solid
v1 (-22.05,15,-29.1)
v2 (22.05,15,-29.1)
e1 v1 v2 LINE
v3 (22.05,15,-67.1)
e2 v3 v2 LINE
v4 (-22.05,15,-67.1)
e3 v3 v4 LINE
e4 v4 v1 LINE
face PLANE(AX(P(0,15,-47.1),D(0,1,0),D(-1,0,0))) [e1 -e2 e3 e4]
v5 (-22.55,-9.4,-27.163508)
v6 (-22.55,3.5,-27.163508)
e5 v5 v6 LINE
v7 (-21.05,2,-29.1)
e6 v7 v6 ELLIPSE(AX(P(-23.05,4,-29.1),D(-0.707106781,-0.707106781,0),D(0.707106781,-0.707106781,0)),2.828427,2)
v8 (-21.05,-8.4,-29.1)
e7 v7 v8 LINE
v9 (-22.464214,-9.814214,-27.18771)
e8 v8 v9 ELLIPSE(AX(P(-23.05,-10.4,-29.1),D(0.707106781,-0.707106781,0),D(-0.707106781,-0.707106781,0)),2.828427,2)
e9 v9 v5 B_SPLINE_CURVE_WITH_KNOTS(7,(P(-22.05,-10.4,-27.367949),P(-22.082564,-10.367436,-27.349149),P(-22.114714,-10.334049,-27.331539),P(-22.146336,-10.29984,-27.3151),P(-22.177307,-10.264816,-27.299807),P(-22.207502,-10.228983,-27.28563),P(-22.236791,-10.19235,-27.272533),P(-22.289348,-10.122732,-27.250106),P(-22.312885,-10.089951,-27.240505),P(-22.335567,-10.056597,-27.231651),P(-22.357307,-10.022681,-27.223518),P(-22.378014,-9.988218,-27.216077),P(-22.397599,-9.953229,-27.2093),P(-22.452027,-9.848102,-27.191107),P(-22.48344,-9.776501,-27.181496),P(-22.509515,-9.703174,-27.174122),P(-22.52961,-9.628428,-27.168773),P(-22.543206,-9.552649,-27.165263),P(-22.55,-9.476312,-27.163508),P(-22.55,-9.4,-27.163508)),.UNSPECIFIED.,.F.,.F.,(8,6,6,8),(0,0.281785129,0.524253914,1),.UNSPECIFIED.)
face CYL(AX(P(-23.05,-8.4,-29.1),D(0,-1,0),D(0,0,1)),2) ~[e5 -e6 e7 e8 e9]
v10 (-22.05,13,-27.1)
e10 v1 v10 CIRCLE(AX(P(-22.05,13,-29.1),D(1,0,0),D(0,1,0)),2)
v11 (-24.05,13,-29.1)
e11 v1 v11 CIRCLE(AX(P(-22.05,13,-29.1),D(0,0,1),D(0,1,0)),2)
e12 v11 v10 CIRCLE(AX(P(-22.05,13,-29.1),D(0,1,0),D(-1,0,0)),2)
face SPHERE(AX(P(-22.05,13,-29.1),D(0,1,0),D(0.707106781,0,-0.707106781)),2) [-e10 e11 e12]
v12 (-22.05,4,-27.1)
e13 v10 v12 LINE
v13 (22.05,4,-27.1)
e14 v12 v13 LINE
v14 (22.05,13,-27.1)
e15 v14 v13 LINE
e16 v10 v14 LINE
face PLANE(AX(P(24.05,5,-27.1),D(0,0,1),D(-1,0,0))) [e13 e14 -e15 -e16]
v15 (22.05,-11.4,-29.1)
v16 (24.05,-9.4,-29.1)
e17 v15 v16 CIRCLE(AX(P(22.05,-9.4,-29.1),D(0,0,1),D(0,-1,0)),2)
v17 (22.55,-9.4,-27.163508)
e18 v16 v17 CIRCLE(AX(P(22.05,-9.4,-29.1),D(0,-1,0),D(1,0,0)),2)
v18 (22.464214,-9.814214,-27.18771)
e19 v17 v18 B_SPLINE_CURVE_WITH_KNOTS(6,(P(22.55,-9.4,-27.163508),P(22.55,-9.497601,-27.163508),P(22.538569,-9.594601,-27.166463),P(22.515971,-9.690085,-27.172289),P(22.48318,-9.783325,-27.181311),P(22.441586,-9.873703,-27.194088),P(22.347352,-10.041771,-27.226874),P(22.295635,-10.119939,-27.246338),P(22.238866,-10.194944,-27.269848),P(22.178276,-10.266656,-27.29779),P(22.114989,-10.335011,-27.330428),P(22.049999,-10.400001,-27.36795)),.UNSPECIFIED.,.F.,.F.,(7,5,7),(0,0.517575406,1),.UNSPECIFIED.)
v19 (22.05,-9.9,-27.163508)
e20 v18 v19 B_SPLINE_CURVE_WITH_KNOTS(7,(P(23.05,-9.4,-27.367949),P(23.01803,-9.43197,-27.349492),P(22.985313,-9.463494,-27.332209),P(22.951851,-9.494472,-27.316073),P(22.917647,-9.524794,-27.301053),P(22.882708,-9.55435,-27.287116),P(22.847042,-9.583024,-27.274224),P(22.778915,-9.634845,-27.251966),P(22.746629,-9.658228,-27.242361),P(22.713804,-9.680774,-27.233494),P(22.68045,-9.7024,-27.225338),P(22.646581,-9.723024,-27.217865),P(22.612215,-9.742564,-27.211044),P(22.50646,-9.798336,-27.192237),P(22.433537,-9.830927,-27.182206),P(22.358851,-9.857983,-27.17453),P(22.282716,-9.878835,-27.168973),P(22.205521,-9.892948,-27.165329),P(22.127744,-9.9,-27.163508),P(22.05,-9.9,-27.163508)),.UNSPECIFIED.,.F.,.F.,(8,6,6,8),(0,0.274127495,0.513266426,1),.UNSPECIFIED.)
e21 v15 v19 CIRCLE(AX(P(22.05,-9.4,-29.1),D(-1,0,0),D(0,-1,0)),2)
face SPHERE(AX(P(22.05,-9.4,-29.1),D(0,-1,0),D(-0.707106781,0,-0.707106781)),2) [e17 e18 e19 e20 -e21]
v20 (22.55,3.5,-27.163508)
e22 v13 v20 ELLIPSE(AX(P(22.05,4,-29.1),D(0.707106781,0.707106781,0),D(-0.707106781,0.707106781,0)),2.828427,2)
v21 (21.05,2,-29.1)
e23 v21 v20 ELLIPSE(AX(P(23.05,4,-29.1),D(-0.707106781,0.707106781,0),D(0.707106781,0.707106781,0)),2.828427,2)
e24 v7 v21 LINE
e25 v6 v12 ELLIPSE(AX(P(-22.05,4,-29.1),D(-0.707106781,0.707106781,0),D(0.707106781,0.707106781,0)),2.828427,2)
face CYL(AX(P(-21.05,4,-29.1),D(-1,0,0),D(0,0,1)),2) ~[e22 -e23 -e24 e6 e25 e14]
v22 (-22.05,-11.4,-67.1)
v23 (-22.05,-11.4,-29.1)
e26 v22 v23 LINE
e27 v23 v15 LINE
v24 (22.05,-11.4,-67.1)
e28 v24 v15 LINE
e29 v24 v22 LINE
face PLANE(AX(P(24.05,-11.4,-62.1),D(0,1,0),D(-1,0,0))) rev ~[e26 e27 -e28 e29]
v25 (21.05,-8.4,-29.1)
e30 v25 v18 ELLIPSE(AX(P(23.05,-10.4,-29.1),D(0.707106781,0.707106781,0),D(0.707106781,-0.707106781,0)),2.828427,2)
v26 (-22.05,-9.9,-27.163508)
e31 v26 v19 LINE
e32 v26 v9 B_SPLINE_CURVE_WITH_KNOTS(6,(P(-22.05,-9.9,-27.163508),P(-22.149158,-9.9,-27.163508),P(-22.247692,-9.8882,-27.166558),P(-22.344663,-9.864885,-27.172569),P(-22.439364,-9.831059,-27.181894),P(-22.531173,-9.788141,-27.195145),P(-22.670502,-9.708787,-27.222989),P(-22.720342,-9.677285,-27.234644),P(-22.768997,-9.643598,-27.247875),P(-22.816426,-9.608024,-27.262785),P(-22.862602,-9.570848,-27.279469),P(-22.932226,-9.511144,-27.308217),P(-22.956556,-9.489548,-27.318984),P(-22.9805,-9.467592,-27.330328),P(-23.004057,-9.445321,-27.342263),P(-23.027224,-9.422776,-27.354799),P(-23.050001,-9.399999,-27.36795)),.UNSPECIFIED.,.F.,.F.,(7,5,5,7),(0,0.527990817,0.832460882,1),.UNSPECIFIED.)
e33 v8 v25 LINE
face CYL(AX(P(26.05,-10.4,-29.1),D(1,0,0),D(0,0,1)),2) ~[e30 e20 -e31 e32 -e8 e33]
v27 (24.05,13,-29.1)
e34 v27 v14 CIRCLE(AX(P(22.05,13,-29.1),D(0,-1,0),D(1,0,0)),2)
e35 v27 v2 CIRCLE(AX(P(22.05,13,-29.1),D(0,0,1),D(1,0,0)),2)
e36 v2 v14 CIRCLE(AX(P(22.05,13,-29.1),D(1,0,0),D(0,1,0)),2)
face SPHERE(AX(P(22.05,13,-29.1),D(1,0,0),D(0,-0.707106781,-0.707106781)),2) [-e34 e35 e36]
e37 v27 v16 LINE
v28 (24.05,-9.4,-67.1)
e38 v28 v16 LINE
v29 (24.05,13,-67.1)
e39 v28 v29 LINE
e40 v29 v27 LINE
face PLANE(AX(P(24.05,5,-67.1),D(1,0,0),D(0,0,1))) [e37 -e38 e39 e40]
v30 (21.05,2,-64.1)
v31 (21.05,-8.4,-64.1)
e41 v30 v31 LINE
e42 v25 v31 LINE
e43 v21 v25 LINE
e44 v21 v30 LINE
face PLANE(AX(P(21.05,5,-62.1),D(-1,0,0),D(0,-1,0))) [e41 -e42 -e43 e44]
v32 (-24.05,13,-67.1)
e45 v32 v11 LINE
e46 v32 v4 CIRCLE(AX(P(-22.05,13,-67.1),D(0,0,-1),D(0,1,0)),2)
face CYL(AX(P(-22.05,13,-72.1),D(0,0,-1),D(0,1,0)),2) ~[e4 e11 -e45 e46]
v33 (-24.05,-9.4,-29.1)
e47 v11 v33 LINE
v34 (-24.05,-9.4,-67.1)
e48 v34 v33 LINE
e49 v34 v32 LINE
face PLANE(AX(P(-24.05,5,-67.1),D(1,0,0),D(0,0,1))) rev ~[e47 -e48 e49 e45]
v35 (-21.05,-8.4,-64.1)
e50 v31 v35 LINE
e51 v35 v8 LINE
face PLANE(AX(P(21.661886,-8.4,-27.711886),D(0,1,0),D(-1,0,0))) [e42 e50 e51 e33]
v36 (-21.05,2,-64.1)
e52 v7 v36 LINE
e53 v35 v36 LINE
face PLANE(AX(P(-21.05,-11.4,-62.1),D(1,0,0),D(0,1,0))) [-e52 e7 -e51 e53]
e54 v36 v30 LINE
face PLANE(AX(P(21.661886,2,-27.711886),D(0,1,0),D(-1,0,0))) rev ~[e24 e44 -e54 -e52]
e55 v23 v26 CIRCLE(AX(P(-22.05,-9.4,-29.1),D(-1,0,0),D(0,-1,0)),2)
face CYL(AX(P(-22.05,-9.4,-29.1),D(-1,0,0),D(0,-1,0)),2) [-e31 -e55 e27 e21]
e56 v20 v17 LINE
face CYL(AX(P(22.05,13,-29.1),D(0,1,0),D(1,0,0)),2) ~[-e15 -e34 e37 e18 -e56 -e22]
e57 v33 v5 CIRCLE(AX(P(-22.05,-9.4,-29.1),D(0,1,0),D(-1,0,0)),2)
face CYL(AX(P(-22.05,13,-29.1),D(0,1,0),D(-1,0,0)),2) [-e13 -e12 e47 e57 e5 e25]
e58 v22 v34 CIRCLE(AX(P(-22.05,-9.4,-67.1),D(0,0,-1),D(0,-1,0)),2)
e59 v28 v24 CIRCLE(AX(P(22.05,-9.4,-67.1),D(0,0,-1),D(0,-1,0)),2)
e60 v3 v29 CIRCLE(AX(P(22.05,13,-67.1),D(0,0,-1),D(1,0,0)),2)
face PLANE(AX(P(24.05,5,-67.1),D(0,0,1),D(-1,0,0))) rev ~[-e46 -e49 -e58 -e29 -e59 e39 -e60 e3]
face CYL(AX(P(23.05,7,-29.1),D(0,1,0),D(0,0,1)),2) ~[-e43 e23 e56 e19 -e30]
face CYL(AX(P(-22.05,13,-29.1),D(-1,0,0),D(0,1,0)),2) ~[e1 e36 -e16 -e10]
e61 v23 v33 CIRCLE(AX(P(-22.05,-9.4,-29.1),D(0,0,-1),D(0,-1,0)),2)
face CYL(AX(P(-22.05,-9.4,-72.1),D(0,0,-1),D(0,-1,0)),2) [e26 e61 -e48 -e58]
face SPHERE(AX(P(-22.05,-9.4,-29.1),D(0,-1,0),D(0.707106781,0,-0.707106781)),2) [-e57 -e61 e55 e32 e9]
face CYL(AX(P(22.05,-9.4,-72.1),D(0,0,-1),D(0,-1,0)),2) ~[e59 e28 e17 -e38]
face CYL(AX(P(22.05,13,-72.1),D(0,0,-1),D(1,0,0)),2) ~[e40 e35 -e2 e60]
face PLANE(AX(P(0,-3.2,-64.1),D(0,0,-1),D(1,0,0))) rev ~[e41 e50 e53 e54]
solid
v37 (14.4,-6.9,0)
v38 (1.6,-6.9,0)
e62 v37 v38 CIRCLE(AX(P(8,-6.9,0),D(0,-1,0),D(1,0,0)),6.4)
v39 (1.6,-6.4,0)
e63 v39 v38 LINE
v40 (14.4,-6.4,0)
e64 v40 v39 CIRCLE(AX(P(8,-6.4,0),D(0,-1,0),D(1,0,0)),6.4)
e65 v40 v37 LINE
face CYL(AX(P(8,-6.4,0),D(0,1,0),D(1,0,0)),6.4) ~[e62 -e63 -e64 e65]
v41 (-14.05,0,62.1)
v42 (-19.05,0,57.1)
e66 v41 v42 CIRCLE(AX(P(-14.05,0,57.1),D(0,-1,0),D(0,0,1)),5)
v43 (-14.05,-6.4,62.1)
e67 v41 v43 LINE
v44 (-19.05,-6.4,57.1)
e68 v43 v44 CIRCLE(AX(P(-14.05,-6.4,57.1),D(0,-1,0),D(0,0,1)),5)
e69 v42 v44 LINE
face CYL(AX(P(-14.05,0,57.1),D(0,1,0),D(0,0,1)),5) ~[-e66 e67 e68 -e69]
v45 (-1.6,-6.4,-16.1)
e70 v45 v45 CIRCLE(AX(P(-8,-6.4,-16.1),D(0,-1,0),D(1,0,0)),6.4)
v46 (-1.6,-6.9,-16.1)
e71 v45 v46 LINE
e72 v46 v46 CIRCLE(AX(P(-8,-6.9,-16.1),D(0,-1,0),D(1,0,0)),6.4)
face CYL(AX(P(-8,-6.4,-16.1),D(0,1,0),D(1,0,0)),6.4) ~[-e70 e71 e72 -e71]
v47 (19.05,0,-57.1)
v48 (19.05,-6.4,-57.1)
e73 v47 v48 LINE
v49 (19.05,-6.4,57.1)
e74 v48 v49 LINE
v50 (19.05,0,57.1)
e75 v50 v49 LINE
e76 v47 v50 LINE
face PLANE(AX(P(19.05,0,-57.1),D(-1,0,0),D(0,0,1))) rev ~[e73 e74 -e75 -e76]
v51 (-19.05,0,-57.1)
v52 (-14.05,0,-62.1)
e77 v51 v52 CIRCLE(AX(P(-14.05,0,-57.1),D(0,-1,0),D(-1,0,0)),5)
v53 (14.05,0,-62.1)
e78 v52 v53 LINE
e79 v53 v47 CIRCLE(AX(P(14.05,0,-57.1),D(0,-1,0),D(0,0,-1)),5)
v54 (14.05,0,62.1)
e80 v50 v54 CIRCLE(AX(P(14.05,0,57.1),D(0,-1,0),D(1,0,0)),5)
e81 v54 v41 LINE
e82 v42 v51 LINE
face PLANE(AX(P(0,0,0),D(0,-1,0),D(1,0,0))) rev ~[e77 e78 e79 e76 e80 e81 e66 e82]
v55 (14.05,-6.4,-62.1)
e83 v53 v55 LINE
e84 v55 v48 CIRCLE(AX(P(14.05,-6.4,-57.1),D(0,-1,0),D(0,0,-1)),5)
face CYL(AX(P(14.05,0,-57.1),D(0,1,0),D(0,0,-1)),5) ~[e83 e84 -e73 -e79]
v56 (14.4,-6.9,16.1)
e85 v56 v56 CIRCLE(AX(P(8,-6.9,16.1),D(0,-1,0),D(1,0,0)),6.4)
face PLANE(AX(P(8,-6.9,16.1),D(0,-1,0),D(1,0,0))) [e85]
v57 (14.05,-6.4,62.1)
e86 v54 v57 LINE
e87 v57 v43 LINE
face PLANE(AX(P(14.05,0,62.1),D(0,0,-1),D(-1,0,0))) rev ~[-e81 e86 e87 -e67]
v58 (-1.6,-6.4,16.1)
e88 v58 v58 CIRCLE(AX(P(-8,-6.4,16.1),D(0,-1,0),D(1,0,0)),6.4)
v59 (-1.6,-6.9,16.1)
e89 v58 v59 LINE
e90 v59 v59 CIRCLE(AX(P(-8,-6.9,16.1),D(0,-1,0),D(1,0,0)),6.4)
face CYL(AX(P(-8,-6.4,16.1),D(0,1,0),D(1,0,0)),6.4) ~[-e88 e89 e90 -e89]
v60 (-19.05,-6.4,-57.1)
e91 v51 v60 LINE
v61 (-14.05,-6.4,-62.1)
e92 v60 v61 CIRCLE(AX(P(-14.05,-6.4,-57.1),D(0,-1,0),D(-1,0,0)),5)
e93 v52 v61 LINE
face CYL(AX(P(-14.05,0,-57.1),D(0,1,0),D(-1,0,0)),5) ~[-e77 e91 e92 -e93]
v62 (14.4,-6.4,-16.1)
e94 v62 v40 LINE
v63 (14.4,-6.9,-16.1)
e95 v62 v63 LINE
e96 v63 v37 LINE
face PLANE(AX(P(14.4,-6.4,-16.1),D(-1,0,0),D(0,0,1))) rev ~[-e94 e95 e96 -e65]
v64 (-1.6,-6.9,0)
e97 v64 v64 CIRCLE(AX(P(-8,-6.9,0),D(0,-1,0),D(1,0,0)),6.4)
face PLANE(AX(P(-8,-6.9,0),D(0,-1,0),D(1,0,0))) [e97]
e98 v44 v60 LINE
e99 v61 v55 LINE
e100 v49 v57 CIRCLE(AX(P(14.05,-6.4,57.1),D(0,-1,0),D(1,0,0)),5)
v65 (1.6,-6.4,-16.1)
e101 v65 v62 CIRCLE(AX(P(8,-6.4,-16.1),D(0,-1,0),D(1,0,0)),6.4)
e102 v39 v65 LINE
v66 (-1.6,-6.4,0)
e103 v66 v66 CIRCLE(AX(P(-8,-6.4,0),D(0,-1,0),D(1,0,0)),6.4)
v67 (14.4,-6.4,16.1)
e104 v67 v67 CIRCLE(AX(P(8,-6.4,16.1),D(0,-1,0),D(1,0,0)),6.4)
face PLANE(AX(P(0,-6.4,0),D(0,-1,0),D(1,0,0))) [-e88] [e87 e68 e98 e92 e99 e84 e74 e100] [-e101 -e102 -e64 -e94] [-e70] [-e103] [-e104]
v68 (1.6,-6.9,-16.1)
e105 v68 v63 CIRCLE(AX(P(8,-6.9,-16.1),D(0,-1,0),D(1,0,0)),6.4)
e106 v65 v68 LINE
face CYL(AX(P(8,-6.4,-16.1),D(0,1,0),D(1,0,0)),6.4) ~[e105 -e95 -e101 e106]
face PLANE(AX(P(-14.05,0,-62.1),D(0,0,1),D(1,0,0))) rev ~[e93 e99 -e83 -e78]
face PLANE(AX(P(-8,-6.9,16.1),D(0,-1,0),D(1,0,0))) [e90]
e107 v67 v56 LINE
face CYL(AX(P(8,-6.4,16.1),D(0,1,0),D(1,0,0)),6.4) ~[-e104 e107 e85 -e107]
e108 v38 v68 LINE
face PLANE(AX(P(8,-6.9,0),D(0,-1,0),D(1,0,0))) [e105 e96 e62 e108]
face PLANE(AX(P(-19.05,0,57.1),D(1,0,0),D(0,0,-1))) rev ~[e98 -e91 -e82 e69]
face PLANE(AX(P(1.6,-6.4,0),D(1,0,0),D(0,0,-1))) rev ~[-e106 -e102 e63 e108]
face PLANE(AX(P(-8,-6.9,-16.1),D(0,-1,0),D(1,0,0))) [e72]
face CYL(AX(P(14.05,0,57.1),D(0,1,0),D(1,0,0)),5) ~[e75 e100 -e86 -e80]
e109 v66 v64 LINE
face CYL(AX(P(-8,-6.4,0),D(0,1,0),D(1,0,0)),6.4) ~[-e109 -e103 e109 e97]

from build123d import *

# Parameters (mm, degrees)
F1_DEPTH      = 6.4
F2_R          = 6.4
F3_DEPTH      = 0.5
F5_DEPTH      = 35
F5_DEPTH_BACK = 5
F6_T          = -3
F7_W          = 48.1
F7_H          = 40
F8_DEPTH      = 10
F9_T1_DEPTH   = 22.4
F9_T3_DEPTH   = 44.1
F9_T5_DEPTH   = 10.4
F9_T7_DEPTH   = 42.1
F9_T9_DEPTH   = 43
F9_S13_W      = 2
F9_S13_H      = 2
F9_T14_DEPTH  = 2
F9_S19_W      = 2
F9_S19_H      = 2
F9_T20_DEPTH  = 2
F9_S25_W      = 2
F9_S25_H      = 2
F9_T26_DEPTH  = 2
F9_S31_W      = 2
F9_S31_H      = 2
F9_T32_DEPTH  = 2
F9_T39_DEPTH  = 15.4
F9_T43_DEPTH  = 47.1
F9_T50_DEPTH  = 15.4
F9_T54_DEPTH  = 47.1
F9_T61_DEPTH  = 47.1
F9_T65_DEPTH  = 15.4
F9_T72_DEPTH  = 15.4
F9_T76_DEPTH  = 47.1


# Not quite as in the source:
# - a fillet or chamfer that OpenCascade refuses, or shapes differently, is made with other operations: its cross-section is extruded or revolved along the edge and cut away or added


with BuildPart() as f1:
    # F0 (on Front) → F1 (new body)
    with BuildSketch(Plane.XZ):
        with BuildLine():
            ThreePointArc((19.05, 57.1), (17.5855339059, 60.6355339059), (14.05, 62.1))
            Line((14.05, 62.1), (-14.05, 62.1))
            ThreePointArc((-14.05, 62.1), (-17.5855339059, 60.6355339059), (-19.05, 57.1))
            Line((-19.05, 57.1), (-19.05, -57.1))
            ThreePointArc((-19.05, -57.1), (-17.5855339059, -60.6355339059), (-14.05, -62.1))
            Line((-14.05, -62.1), (14.05, -62.1))
            ThreePointArc((14.05, -62.1), (17.5855339059, -60.6355339059), (19.05, -57.1))
            Line((19.05, -57.1), (19.05, 57.1))
        make_face()
    extrude(amount=F1_DEPTH)

    # F2 (on face) → F3 (join)
    with BuildSketch(Plane.XZ.offset(6.4)):
        with BuildLine():
            ThreePointArc((1.6, 0), (8, -6.4), (14.4, 0))
            ThreePointArc((14.4, 0), (8, 6.4), (1.6, 0))
        make_face()
        with BuildLine():
            Line((14.4, -16.1), (14.4, 0))
            ThreePointArc((14.4, 0), (8, -6.4), (1.6, 0))
            Line((1.6, 0), (1.6, -16.1))
            ThreePointArc((1.6, -16.1), (8, -9.7), (14.4, -16.1))
        make_face()
        with BuildLine():
            ThreePointArc((1.6, -16.1), (8, -22.5), (14.4, -16.1))
            ThreePointArc((14.4, -16.1), (8, -9.7), (1.6, -16.1))
        make_face()
        with Locations((8, 16.1)):
            Circle(F2_R)
        with Locations((-8, 16.1)):
            Circle(F2_R)
        with Locations((-8, 0)):
            Circle(F2_R)
        with Locations((-8, -16.1)):
            Circle(F2_R)
    extrude(amount=F3_DEPTH)


with BuildPart() as f5:
    # F4 (on face) → F5 (new body, two sides)
    with BuildSketch(Plane(origin=(0, 0, -62.1), x_dir=(1, 0, 0), z_dir=(0, 0, -1))) as f5_sk:
        Polygon((-14.05, 11.4), (-24.05, 11.4), (-24.05, -5), (-14.05, -5), (14.05, -5), (24.05, -5), (24.05, 11.4), (14.05, 11.4), align=None)
    extrude(amount=-F5_DEPTH)
    extrude(f5_sk.sketch, amount=F5_DEPTH_BACK)

    # F6
    f6_openings = [f5.faces().sort_by_distance(p)[0] for p in [
        (0, -3.2, -27.1),
    ]]
    offset(amount=F6_T, openings=f6_openings)

    # F7 (on face) → F8 (join)
    with BuildSketch(Plane(origin=(0, 5, 0), x_dir=(-1, 0, 0), z_dir=(0, 1, 0))):
        with Locations((0, -47.1)):
            Rectangle(F7_W, F7_H)
    extrude(amount=F8_DEPTH)

    # F9: fillet of radius 2 on 12 edges, made by hand

    # F9_s2 → F9_t1 (cut)
    with BuildSketch(Plane.XZ.offset(-13)):
        with BuildLine():
            ThreePointArc((-24.05, -29.1), (-23.4642135624, -27.6857864376), (-22.05, -27.1))
            Line((-22.05, -27.1), (-24.05, -27.1))
            Line((-24.05, -27.1), (-24.05, -29.1))
        make_face()
        with BuildLine():
            ThreePointArc((24.05, -29.1), (23.4642135624, -27.6857864376), (22.05, -27.1))
            Line((22.05, -27.1), (24.05, -27.1))
            Line((24.05, -27.1), (24.05, -29.1))
        make_face()
    extrude(amount=F9_T1_DEPTH, mode=Mode.SUBTRACT)

    # F9_s4 → F9_t3 (cut)
    with BuildSketch(Plane.YZ.offset(-22.05)):
        with BuildLine():
            ThreePointArc((15, -29.1), (14.4142135624, -27.6857864376), (13, -27.1))
            Line((13, -27.1), (15, -27.1))
            Line((15, -27.1), (15, -29.1))
        make_face()
        with BuildLine():
            ThreePointArc((-11.4, -29.1), (-10.8142135624, -27.6857864376), (-9.4, -27.1))
            Line((-9.4, -27.1), (-11.4, -27.1))
            Line((-11.4, -27.1), (-11.4, -29.1))
        make_face()
    extrude(amount=F9_T3_DEPTH, mode=Mode.SUBTRACT)

    # F9_s6 → F9_t5 (cut)
    with BuildSketch(Plane.XZ.offset(-2)):
        with BuildLine():
            ThreePointArc((-23.05, -27.1), (-21.6357864376, -27.6857864376), (-21.05, -29.1))
            Line((-21.05, -29.1), (-21.05, -27.1))
            Line((-21.05, -27.1), (-23.05, -27.1))
        make_face()
        with BuildLine():
            ThreePointArc((23.05, -27.1), (21.6357864376, -27.6857864376), (21.05, -29.1))
            Line((21.05, -29.1), (21.05, -27.1))
            Line((21.05, -27.1), (23.05, -27.1))
        make_face()
    extrude(amount=F9_T5_DEPTH, mode=Mode.SUBTRACT)

    # F9_s8 → F9_t7 (cut)
    with BuildSketch(Plane.YZ.offset(-21.05)):
        with BuildLine():
            ThreePointArc((-10.4, -27.1), (-8.9857864376, -27.6857864376), (-8.4, -29.1))
            Line((-8.4, -29.1), (-8.4, -27.1))
            Line((-8.4, -27.1), (-10.4, -27.1))
        make_face()
        with BuildLine():
            ThreePointArc((4, -27.1), (2.5857864376, -27.6857864376), (2, -29.1))
            Line((2, -29.1), (2, -27.1))
            Line((2, -27.1), (4, -27.1))
        make_face()
    extrude(amount=F9_T7_DEPTH, mode=Mode.SUBTRACT)

    # F9_s10 → F9_t9 (cut)
    with BuildSketch(Plane.XY.offset(-72.1)):
        with BuildLine():
            ThreePointArc((22.05, -11.4), (23.4642135624, -10.8142135624), (24.05, -9.4))
            Line((24.05, -9.4), (24.05, -11.4))
            Line((24.05, -11.4), (22.05, -11.4))
        make_face()
        with BuildLine():
            ThreePointArc((24.05, 13), (23.4642135624, 14.4142135624), (22.05, 15))
            Line((22.05, 15), (24.05, 15))
            Line((24.05, 15), (24.05, 13))
        make_face()
        with BuildLine():
            ThreePointArc((-22.05, 15), (-23.4642135624, 14.4142135624), (-24.05, 13))
            Line((-24.05, 13), (-24.05, 15))
            Line((-24.05, 15), (-22.05, 15))
        make_face()
        with BuildLine():
            ThreePointArc((-22.05, -11.4), (-23.4642135624, -10.8142135624), (-24.05, -9.4))
            Line((-24.05, -9.4), (-24.05, -11.4))
            Line((-24.05, -11.4), (-22.05, -11.4))
        make_face()
    extrude(amount=F9_T9_DEPTH, mode=Mode.SUBTRACT)


with BuildPart() as f9_tool12:
    # F9_s13 → F9_t14 (new body)
    with BuildSketch(Plane.XZ.offset(-13)):
        with Locations((-23.05, -28.1)):
            Rectangle(F9_S13_W, F9_S13_H)
    extrude(amount=-F9_T14_DEPTH)

    # F9_s15 → F9_t16 (revolve, cut)
    with BuildSketch(Plane(origin=(-22.05, 13, -29.1), x_dir=(0.7071067812, 0, -0.7071067812), z_dir=(0.7071067812, 0, 0.7071067812))):
        with BuildLine():
            ThreePointArc((0, -2), (2, 0), (0, 2))
            Line((0, 2), (0, -2))
        make_face()
    revolve(axis=Axis((-22.05, 13, -29.1), (0, 1, 0)), mode=Mode.SUBTRACT)


with BuildPart() as f5_1:
    add(f5.part)

    # F9_t11: cut F9_tool12
    add(f9_tool12.part, mode=Mode.SUBTRACT)


with BuildPart() as f9_tool18:
    # F9_s19 → F9_t20 (new body)
    with BuildSketch(Plane.XZ.offset(9.4)):
        with Locations((-23.05, -28.1)):
            Rectangle(F9_S19_W, F9_S19_H)
    extrude(amount=F9_T20_DEPTH)

    # F9_s21 → F9_t22 (revolve, cut)
    with BuildSketch(Plane(origin=(-22.05, -9.4, -29.1), x_dir=(0.7071067812, 0, -0.7071067812), z_dir=(-0.7071067812, 0, -0.7071067812))):
        with BuildLine():
            ThreePointArc((0, -2), (2, 0), (0, 2))
            Line((0, 2), (0, -2))
        make_face()
    revolve(axis=Axis((-22.05, -9.4, -29.1), (0, -1, 0)), mode=Mode.SUBTRACT)


with BuildPart() as f5_2:
    add(f5_1.part)

    # F9_t17: cut F9_tool18
    add(f9_tool18.part, mode=Mode.SUBTRACT)


with BuildPart() as f9_tool24:
    # F9_s25 → F9_t26 (new body)
    with BuildSketch(Plane.YZ.offset(22.05)):
        with Locations((14, -28.1)):
            Rectangle(F9_S25_W, F9_S25_H)
    extrude(amount=F9_T26_DEPTH)

    # F9_s27 → F9_t28 (revolve, cut)
    with BuildSketch(Plane(origin=(22.05, 13, -29.1), x_dir=(0, -0.7071067812, -0.7071067812), z_dir=(0, -0.7071067812, 0.7071067812))):
        with BuildLine():
            ThreePointArc((0, -2), (2, 0), (0, 2))
            Line((0, 2), (0, -2))
        make_face()
    revolve(axis=Axis((22.05, 13, -29.1), (1, 0, 0)), mode=Mode.SUBTRACT)


with BuildPart() as f5_3:
    add(f5_2.part)

    # F9_t23: cut F9_tool24
    add(f9_tool24.part, mode=Mode.SUBTRACT)


with BuildPart() as f9_tool30:
    # F9_s31 → F9_t32 (new body)
    with BuildSketch(Plane.XZ.offset(9.4)):
        with Locations((23.05, -28.1)):
            Rectangle(F9_S31_W, F9_S31_H)
    extrude(amount=F9_T32_DEPTH)

    # F9_s33 → F9_t34 (revolve, cut)
    with BuildSketch(Plane(origin=(22.05, -9.4, -29.1), x_dir=(-0.7071067812, 0, -0.7071067812), z_dir=(-0.7071067812, 0, 0.7071067812))):
        with BuildLine():
            ThreePointArc((0, -2), (2, 0), (0, 2))
            Line((0, 2), (0, -2))
        make_face()
    revolve(axis=Axis((22.05, -9.4, -29.1), (0, -1, 0)), mode=Mode.SUBTRACT)


with BuildPart() as f5_4:
    add(f5_3.part)

    # F9_t29: cut F9_tool30
    add(f9_tool30.part, mode=Mode.SUBTRACT)


with BuildPart() as f9_tool37:
    # F9_s38 → F9_t39 (new body)
    with BuildSketch(Plane.XZ.offset(13.4)):
        with BuildLine():
            ThreePointArc((-23.05, -27.1), (-21.6357864376, -27.6857864376), (-21.05, -29.1))
            Line((-21.05, -29.1), (-21.05, -27.1))
            Line((-21.05, -27.1), (-23.05, -27.1))
        make_face()
    extrude(amount=-F9_T39_DEPTH)

    split(bisect_by=Plane.XZ.offset(8.4), keep=Keep.TOP)


with BuildPart() as f9_tool41:
    # F9_s42 → F9_t43 (new body)
    with BuildSketch(Plane.YZ.offset(21.05)):
        with BuildLine():
            ThreePointArc((-10.4, -27.1), (-8.9857864376, -27.6857864376), (-8.4, -29.1))
            Line((-8.4, -29.1), (-8.4, -27.1))
            Line((-8.4, -27.1), (-10.4, -27.1))
        make_face()
    extrude(amount=-F9_T43_DEPTH)

    split(bisect_by=Plane.YZ.offset(-21.05), keep=Keep.BOTTOM)


with BuildPart() as f9_tool37_1:
    add(f9_tool37.part)

    # F9_t45: intersect F9_tool41
    add(f9_tool41.part, mode=Mode.INTERSECT)


with BuildPart() as f5_5:
    add(f5_4.part)

    # F9_t35: cut F9_tool37
    add(f9_tool37_1.part, mode=Mode.SUBTRACT)


with BuildPart() as f9_tool48:
    # F9_s49 → F9_t50 (new body)
    with BuildSketch(Plane.XZ.offset(8.4)):
        with BuildLine():
            ThreePointArc((-23.05, -27.1), (-21.6357864376, -27.6857864376), (-21.05, -29.1))
            Line((-21.05, -29.1), (-21.05, -27.1))
            Line((-21.05, -27.1), (-23.05, -27.1))
        make_face()
    extrude(amount=-F9_T50_DEPTH)

    split(bisect_by=Plane.XZ.offset(-2), keep=Keep.BOTTOM)


with BuildPart() as f9_tool52:
    # F9_s53 → F9_t54 (new body)
    with BuildSketch(Plane.YZ.offset(-26.05)):
        with BuildLine():
            ThreePointArc((4, -27.1), (2.5857864376, -27.6857864376), (2, -29.1))
            Line((2, -29.1), (2, -27.1))
            Line((2, -27.1), (4, -27.1))
        make_face()
    extrude(amount=F9_T54_DEPTH)

    split(bisect_by=Plane.YZ.offset(-21.05), keep=Keep.BOTTOM)


with BuildPart() as f9_tool48_1:
    add(f9_tool48.part)

    # F9_t56: intersect F9_tool52
    add(f9_tool52.part, mode=Mode.INTERSECT)


with BuildPart() as f5_6:
    add(f5_5.part)

    # F9_t46: cut F9_tool48
    add(f9_tool48_1.part, mode=Mode.SUBTRACT)


with BuildPart() as f9_tool59:
    # F9_s60 → F9_t61 (new body)
    with BuildSketch(Plane.YZ.offset(26.05)):
        with BuildLine():
            ThreePointArc((-10.4, -27.1), (-8.9857864376, -27.6857864376), (-8.4, -29.1))
            Line((-8.4, -29.1), (-8.4, -27.1))
            Line((-8.4, -27.1), (-10.4, -27.1))
        make_face()
    extrude(amount=-F9_T61_DEPTH)

    split(bisect_by=Plane.YZ.offset(21.05), keep=Keep.TOP)


with BuildPart() as f9_tool63:
    # F9_s64 → F9_t65 (new body)
    with BuildSketch(Plane.XZ.offset(-2)):
        with BuildLine():
            ThreePointArc((23.05, -27.1), (21.6357864376, -27.6857864376), (21.05, -29.1))
            Line((21.05, -29.1), (21.05, -27.1))
            Line((21.05, -27.1), (23.05, -27.1))
        make_face()
    extrude(amount=F9_T65_DEPTH)

    split(bisect_by=Plane.XZ.offset(8.4), keep=Keep.TOP)


with BuildPart() as f9_tool59_1:
    add(f9_tool59.part)

    # F9_t67: intersect F9_tool63
    add(f9_tool63.part, mode=Mode.INTERSECT)


with BuildPart() as f5_7:
    add(f5_6.part)

    # F9_t57: cut F9_tool59
    add(f9_tool59_1.part, mode=Mode.SUBTRACT)


with BuildPart() as f9_tool70:
    # F9_s71 → F9_t72 (new body)
    with BuildSketch(Plane.XZ.offset(-7)):
        with BuildLine():
            ThreePointArc((23.05, -27.1), (21.6357864376, -27.6857864376), (21.05, -29.1))
            Line((21.05, -29.1), (21.05, -27.1))
            Line((21.05, -27.1), (23.05, -27.1))
        make_face()
    extrude(amount=F9_T72_DEPTH)

    split(bisect_by=Plane.XZ.offset(-2), keep=Keep.BOTTOM)


with BuildPart() as f9_tool74:
    # F9_s75 → F9_t76 (new body)
    with BuildSketch(Plane.YZ.offset(-21.05)):
        with BuildLine():
            ThreePointArc((4, -27.1), (2.5857864376, -27.6857864376), (2, -29.1))
            Line((2, -29.1), (2, -27.1))
            Line((2, -27.1), (4, -27.1))
        make_face()
    extrude(amount=F9_T76_DEPTH)

    split(bisect_by=Plane.YZ.offset(21.05), keep=Keep.TOP)


with BuildPart() as f9_tool70_1:
    add(f9_tool70.part)

    # F9_t78: intersect F9_tool74
    add(f9_tool74.part, mode=Mode.INTERSECT)


with BuildPart() as f5_8:
    add(f5_7.part)

    # F9_t68: cut F9_tool70
    add(f9_tool70_1.part, mode=Mode.SUBTRACT)


solid = Compound([f1.part, f5_8.part])
